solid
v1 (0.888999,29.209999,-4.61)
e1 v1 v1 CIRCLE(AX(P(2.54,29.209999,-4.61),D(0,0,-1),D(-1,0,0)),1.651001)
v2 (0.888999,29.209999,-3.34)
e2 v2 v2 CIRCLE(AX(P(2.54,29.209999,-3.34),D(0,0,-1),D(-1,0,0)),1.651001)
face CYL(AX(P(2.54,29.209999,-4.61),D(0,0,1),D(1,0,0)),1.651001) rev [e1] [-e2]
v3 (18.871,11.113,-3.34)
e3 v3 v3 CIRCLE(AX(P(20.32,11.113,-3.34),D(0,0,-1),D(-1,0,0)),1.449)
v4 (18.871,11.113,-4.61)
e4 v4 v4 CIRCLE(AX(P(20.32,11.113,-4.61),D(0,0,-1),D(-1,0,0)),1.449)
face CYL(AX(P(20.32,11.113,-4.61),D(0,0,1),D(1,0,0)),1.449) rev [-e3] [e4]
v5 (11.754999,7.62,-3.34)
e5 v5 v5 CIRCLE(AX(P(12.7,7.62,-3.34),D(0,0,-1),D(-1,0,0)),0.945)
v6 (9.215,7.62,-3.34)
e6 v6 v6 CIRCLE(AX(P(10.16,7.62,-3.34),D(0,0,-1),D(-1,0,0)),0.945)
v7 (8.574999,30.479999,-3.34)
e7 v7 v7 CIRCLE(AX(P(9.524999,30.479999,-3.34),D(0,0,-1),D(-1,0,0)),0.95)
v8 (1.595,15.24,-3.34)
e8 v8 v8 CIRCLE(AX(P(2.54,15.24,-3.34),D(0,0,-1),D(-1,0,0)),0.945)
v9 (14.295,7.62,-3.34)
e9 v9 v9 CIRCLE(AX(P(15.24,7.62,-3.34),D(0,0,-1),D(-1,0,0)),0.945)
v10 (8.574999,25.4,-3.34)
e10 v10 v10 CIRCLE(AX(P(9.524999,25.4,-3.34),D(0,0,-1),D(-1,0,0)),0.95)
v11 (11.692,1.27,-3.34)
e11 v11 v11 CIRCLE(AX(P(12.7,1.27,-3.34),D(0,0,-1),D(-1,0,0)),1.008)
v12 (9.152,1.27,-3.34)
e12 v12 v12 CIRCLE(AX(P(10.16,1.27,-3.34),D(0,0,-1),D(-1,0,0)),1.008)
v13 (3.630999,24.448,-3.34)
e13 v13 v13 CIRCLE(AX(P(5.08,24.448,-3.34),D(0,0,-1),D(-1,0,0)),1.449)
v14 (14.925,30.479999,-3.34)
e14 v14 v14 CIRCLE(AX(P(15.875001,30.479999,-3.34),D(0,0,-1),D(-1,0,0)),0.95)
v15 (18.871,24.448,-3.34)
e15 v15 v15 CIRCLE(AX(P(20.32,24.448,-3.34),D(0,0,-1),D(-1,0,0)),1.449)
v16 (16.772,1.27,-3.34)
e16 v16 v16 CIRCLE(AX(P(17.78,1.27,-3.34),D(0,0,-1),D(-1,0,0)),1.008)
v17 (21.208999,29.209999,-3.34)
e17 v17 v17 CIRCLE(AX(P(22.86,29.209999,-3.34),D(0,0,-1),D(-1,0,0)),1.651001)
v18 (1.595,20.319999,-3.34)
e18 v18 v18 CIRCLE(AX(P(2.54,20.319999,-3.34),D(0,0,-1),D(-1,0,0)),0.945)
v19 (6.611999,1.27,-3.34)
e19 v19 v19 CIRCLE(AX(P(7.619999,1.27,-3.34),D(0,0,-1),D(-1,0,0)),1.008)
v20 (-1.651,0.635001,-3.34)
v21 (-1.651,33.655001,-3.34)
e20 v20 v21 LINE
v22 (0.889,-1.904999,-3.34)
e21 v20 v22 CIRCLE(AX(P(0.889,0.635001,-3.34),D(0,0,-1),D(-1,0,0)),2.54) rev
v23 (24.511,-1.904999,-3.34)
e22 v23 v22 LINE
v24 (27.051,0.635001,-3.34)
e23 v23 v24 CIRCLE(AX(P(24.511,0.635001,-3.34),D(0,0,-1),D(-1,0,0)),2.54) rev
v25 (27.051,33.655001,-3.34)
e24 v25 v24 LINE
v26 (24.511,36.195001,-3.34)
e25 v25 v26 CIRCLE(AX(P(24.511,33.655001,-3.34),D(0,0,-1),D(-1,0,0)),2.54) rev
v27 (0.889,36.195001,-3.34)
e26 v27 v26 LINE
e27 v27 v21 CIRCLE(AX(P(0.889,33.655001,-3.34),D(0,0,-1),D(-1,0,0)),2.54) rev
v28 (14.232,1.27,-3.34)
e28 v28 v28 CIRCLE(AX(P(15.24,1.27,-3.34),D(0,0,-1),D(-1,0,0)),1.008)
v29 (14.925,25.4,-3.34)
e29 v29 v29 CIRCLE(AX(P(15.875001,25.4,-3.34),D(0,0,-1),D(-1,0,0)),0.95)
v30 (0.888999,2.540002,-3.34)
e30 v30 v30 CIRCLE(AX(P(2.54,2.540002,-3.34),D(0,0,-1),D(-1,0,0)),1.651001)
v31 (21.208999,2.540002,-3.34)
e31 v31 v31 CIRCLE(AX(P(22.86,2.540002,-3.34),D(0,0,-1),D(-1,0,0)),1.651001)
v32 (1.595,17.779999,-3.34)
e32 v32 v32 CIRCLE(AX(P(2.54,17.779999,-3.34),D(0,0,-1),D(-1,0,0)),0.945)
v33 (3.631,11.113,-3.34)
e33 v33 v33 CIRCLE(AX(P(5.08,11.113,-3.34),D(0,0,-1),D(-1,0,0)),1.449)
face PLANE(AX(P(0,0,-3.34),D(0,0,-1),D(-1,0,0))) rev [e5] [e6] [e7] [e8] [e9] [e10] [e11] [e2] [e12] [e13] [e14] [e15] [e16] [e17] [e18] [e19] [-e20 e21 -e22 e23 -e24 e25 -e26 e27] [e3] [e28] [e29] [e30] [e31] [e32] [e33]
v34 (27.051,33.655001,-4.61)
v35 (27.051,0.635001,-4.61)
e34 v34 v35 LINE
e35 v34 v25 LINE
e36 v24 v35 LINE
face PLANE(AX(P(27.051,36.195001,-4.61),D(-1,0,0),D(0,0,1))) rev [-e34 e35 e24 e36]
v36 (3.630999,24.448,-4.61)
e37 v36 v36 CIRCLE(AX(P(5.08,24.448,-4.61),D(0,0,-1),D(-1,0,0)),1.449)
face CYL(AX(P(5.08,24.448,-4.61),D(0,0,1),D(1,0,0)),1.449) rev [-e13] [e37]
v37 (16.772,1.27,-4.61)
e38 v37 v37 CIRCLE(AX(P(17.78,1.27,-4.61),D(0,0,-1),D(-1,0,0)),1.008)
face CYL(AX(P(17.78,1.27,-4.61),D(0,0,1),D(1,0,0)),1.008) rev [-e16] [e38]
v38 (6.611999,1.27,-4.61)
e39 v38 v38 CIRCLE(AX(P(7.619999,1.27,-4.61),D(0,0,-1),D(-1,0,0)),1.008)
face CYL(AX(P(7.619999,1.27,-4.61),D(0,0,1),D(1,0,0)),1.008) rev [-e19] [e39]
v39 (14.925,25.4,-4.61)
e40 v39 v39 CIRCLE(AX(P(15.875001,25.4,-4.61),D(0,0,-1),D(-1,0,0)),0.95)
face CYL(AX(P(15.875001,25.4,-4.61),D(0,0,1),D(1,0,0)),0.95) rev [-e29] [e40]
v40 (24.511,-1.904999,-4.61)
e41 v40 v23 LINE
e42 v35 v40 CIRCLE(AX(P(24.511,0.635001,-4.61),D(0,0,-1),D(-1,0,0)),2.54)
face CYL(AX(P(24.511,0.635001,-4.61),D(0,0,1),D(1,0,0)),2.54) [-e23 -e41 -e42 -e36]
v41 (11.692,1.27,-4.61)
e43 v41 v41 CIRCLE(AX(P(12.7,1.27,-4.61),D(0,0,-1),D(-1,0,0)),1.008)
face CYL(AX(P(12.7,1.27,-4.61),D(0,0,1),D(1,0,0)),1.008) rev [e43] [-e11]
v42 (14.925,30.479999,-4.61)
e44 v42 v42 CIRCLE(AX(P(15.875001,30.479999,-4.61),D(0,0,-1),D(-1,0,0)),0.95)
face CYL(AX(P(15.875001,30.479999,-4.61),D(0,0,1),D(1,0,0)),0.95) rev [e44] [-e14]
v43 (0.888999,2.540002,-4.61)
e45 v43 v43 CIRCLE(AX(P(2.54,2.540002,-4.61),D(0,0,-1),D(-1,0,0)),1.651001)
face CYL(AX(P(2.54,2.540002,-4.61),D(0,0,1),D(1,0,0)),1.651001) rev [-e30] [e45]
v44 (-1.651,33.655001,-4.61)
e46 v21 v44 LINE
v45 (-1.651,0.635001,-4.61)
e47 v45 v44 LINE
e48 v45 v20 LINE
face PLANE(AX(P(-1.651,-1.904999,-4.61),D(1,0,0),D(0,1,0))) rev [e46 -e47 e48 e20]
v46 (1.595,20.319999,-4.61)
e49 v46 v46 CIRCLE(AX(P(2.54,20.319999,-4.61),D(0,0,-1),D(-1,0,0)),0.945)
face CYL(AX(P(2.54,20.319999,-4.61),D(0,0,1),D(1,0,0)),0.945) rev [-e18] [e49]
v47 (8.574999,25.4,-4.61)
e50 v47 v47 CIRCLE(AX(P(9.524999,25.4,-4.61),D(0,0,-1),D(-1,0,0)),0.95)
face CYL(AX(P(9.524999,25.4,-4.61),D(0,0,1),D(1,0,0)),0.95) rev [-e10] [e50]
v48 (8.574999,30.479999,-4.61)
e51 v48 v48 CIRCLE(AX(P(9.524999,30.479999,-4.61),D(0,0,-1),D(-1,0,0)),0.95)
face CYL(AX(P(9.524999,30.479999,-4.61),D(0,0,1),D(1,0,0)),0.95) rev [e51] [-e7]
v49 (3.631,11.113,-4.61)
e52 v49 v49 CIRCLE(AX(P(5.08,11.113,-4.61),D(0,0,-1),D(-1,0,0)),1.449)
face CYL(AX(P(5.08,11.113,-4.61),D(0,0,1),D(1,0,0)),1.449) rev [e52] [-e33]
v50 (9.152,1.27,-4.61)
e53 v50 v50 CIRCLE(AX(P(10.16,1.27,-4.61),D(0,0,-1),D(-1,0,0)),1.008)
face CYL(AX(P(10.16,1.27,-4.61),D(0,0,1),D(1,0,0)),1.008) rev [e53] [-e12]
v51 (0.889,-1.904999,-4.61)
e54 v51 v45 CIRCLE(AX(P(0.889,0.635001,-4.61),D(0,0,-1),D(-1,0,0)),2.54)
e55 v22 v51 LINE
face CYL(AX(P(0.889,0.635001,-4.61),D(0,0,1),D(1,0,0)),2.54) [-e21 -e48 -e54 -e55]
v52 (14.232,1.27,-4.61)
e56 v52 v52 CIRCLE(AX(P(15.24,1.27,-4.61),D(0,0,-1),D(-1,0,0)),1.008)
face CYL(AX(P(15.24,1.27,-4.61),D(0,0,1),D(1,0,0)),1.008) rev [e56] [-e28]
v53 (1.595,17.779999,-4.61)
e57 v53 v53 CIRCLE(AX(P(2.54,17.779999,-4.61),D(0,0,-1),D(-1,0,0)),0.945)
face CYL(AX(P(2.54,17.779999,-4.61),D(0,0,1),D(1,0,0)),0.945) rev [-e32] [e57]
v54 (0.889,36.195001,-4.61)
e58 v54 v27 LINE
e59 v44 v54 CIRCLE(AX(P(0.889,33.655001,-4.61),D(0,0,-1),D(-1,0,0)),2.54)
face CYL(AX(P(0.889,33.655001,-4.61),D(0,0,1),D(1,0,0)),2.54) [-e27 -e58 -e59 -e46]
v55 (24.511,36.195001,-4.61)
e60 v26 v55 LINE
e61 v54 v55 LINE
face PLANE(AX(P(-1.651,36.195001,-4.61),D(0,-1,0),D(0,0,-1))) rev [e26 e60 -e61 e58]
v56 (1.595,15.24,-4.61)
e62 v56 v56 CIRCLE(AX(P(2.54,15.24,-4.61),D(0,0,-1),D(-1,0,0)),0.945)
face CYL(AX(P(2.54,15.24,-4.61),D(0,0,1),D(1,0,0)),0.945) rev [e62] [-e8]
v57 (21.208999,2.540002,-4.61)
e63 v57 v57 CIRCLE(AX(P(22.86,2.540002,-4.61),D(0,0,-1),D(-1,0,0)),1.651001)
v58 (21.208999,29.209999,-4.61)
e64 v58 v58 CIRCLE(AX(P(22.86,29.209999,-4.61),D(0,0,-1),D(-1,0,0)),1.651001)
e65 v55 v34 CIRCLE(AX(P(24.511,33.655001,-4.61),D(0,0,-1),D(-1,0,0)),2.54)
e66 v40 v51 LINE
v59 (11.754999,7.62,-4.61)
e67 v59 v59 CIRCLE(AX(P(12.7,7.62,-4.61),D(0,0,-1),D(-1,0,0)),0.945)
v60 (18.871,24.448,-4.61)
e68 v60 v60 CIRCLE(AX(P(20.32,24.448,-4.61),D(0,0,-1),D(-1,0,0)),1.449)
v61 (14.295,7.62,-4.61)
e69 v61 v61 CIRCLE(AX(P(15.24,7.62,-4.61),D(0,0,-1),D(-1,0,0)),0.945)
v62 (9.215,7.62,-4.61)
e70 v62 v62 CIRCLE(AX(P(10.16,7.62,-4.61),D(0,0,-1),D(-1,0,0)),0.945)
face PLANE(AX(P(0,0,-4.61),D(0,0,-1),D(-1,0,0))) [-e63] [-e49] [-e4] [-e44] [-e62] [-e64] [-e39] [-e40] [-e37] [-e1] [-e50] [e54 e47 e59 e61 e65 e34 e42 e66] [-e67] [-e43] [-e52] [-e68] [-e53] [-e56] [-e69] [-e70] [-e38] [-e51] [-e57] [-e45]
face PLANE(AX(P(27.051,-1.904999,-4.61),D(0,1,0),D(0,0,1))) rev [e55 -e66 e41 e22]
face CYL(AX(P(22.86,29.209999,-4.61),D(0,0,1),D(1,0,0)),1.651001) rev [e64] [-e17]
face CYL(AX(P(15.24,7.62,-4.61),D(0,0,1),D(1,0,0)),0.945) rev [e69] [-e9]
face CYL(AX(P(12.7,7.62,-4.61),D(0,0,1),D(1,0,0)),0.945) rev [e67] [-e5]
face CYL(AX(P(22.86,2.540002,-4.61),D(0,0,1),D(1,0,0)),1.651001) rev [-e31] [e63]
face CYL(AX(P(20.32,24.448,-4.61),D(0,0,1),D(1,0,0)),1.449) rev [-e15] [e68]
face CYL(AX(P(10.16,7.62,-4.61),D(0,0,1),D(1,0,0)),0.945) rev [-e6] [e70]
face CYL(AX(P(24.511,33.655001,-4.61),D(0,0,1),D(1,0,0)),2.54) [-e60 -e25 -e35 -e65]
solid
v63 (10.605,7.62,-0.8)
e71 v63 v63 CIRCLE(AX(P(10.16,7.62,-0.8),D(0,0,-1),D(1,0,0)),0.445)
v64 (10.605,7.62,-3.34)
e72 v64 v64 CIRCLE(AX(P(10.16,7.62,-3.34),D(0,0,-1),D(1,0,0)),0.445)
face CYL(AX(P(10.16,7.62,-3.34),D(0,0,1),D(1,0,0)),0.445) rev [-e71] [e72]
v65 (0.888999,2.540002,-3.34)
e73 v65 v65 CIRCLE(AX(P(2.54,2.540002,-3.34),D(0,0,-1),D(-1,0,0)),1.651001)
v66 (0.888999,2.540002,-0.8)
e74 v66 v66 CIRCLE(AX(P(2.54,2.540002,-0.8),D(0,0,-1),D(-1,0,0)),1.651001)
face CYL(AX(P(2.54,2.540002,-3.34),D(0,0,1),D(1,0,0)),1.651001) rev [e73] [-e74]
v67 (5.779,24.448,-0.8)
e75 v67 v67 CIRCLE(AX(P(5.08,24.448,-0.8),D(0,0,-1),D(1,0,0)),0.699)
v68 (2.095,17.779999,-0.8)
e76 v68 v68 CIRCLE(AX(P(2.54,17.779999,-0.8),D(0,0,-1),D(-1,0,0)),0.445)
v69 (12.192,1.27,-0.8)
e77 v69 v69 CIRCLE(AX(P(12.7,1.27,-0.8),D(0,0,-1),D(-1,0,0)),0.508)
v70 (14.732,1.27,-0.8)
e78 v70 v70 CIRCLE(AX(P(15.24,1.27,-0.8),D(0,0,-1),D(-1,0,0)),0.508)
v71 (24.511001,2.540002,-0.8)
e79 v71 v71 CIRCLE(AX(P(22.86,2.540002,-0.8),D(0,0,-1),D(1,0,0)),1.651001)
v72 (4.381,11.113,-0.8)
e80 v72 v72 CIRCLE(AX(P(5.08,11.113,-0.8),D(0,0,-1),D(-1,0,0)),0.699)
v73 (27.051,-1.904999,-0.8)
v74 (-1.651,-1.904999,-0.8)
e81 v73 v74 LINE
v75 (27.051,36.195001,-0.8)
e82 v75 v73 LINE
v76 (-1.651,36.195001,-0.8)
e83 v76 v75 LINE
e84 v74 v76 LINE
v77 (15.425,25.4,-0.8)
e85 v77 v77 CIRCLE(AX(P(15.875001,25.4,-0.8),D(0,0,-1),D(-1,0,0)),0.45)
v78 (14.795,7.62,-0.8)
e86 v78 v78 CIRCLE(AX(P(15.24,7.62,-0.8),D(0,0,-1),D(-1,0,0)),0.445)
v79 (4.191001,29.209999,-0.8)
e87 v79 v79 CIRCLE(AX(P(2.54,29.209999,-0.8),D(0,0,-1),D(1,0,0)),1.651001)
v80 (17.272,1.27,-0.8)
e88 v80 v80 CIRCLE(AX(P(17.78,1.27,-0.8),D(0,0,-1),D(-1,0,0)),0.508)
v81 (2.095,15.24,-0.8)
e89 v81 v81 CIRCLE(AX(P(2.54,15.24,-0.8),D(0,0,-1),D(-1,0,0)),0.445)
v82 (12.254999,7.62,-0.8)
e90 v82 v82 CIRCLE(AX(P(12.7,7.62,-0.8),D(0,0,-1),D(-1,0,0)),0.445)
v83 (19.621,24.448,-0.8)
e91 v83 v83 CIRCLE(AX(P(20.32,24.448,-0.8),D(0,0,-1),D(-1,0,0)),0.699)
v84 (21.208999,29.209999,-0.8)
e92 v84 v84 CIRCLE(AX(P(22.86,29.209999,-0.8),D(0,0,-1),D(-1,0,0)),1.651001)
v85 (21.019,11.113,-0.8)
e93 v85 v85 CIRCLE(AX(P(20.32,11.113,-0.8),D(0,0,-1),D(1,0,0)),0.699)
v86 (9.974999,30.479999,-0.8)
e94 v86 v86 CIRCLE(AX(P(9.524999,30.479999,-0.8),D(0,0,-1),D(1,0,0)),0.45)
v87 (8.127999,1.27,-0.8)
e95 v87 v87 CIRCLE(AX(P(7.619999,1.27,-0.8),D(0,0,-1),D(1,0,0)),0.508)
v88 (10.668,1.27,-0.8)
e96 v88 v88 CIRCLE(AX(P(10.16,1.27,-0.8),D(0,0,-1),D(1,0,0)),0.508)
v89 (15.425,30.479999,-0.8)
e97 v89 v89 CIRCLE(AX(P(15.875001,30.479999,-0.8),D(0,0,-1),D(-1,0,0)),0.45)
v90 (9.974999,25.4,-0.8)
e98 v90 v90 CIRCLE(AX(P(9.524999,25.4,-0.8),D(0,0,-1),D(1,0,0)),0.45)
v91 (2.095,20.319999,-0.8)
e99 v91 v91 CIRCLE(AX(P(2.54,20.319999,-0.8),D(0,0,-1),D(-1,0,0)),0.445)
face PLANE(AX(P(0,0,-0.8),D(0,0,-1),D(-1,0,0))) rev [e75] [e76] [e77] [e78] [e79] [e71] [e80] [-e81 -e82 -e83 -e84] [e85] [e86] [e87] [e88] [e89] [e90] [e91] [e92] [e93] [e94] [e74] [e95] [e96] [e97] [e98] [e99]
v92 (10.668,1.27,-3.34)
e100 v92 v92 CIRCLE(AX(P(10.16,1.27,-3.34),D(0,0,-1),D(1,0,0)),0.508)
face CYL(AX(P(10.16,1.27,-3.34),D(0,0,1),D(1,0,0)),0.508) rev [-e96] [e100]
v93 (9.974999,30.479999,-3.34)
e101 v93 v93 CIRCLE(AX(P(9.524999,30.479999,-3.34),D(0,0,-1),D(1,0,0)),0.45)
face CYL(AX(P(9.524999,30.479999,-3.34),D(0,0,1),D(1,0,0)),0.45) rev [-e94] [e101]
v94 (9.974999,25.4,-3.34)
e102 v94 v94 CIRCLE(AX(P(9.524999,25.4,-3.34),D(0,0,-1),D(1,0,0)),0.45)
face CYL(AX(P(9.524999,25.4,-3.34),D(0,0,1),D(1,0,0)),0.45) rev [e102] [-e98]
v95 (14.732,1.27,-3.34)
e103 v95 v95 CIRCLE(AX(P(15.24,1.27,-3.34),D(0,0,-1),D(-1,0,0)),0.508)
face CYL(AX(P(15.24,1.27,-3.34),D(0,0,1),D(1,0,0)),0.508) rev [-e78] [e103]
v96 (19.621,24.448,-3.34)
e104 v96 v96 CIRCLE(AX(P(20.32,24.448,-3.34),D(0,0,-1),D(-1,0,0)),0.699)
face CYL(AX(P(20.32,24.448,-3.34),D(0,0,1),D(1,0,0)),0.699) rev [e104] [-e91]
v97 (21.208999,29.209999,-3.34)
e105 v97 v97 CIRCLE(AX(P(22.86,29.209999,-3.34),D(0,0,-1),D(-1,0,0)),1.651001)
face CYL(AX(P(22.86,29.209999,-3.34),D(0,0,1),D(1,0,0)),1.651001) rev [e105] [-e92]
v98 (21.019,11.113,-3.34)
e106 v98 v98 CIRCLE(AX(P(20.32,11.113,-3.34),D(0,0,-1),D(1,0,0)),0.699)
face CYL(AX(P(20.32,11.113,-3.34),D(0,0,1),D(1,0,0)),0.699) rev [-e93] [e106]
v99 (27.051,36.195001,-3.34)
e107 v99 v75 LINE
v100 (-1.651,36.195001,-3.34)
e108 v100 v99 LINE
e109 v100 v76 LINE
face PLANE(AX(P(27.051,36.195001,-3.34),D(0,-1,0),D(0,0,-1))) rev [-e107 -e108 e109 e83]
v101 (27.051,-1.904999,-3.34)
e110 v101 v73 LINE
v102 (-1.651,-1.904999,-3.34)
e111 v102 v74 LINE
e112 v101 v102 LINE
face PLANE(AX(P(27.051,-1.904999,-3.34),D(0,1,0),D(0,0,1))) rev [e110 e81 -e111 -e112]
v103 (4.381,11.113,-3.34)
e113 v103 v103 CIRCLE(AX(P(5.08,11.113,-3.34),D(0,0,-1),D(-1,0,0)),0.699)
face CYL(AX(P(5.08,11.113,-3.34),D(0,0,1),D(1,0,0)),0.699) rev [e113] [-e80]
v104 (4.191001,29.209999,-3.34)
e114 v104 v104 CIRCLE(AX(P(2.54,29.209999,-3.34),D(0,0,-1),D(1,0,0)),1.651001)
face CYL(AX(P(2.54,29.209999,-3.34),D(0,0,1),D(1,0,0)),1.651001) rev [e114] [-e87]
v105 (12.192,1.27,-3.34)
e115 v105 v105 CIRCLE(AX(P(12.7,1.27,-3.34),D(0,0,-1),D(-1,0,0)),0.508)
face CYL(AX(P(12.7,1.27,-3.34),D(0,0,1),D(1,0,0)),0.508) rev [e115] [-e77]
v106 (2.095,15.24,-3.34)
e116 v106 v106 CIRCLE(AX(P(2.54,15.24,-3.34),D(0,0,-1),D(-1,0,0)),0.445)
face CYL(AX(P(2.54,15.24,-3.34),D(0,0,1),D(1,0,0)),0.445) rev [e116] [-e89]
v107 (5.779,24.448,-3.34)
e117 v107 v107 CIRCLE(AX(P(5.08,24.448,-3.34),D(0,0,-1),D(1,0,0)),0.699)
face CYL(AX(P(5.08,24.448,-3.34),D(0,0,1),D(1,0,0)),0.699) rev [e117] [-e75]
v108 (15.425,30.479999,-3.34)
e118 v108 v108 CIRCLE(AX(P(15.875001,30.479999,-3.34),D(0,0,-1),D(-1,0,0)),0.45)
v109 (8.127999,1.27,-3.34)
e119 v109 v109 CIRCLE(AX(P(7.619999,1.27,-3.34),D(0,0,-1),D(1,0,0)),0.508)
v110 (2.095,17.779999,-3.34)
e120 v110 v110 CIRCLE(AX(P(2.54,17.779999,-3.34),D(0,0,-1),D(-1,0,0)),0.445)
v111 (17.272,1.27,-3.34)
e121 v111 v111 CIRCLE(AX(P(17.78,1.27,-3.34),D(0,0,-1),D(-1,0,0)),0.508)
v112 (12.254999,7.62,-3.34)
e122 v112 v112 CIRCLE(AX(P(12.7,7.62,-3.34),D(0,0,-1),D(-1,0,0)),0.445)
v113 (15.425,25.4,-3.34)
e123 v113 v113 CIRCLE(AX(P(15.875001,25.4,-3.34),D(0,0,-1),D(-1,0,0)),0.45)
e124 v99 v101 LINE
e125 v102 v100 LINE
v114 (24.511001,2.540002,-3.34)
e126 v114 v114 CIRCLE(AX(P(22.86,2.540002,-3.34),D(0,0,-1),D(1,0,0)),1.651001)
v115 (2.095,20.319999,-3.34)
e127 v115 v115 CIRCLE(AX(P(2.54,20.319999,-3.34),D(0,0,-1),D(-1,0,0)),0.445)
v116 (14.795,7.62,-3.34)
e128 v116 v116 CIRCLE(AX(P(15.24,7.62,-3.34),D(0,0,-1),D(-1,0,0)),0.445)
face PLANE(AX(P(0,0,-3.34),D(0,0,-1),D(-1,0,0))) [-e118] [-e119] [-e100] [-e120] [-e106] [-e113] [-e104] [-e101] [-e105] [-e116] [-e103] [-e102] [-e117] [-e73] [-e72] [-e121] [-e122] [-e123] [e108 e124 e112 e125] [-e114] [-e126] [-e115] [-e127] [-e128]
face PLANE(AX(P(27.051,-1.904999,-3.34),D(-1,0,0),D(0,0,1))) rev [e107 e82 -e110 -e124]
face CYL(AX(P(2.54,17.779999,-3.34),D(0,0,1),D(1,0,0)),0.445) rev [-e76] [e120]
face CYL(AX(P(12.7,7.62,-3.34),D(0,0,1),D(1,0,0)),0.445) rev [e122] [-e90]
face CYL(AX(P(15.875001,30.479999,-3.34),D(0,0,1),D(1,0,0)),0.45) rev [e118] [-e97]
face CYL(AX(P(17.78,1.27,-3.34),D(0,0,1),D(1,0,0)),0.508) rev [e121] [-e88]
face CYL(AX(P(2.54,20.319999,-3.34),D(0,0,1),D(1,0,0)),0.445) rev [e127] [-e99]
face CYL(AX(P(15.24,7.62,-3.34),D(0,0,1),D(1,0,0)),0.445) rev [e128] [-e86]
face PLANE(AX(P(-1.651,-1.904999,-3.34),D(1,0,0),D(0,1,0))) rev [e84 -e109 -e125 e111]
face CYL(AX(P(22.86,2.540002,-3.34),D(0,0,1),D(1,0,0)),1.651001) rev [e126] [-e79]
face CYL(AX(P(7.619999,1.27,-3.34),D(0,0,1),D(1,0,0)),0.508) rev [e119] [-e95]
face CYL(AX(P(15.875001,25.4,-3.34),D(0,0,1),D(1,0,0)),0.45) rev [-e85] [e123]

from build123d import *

# Parameters (mm, degrees)
SKETCH1_W           = 28.702
SKETCH1_H           = 38.1
SKETCH1_R           = 1.651001197
SKETCH1_R_2         = 0.699000433
SKETCH1_R_3         = 0.450000167
SKETCH1_R_4         = 0.444999896
SKETCH1_R_5         = 0.698999967
SKETCH1_R_6         = 0.445000129
SKETCH1_R_7         = 0.445000362
SKETCH1_R_8         = 0.508000026
BOSS_EXTRUDE1_DEPTH = 2.54
SKETCH2_W           = 28.702
SKETCH2_H           = 38.1
SKETCH2_R           = 1.651001197
SKETCH2_R_2         = 1.449000433
SKETCH2_R_3         = 1.448999967
SKETCH2_R_4         = 0.950000167
SKETCH2_R_5         = 0.945000129
SKETCH2_R_6         = 0.945000362
SKETCH2_R_7         = 1.008000026
SKETCH2_R_8         = 0.944999896
BOSS_EXTRUDE2_DEPTH = 1.27
FILLET1_R           = 2.54


# Read off the part's stored shape, not the designer's step: Surface-Imported1
with BuildPart() as part:
    # Sketch1 → Boss-Extrude1 (new body)
    with BuildSketch(Plane(origin=(0, 0, -0.79999998), x_dir=(-1, 0, 0), z_dir=(0, 0, -1))):
        with Locations((-12.699999847, 17.145000507)):
            Rectangle(SKETCH1_W, SKETCH1_H)
        with Locations((-22.85999991, 29.209999368)):
            Circle(SKETCH1_R, mode=Mode.SUBTRACT)
        with Locations(Location((-2.539999783, 29.209999368, 0), (0, 0, 180))):
            Circle(SKETCH1_R, mode=Mode.SUBTRACT)
        with Locations((-2.539999783, 2.540001646)):
            Circle(SKETCH1_R, mode=Mode.SUBTRACT)
        with Locations(Location((-22.85999991, 2.540001646, 0), (0, 0, 180))):
            Circle(SKETCH1_R, mode=Mode.SUBTRACT)
        with Locations((-20.320000127, 24.447999895)):
            Circle(SKETCH1_R_2, mode=Mode.SUBTRACT)
        with Locations((-15.875000507, 30.479999259)):
            Circle(SKETCH1_R_3, mode=Mode.SUBTRACT)
        with Locations((-15.875000507, 25.399999693)):
            Circle(SKETCH1_R_3, mode=Mode.SUBTRACT)
        with Locations(Location((-9.524999186, 30.479999259, 0), (0, 0, 180))):
            Circle(SKETCH1_R_3, mode=Mode.SUBTRACT)
        with Locations(Location((-9.524999186, 25.399999693, 0), (0, 0, 180))):
            Circle(SKETCH1_R_3, mode=Mode.SUBTRACT)
        with Locations(Location((-5.079999566, 24.447999895, 0), (0, 0, 180))):
            Circle(SKETCH1_R_2, mode=Mode.SUBTRACT)
        with Locations((-2.540000016, 20.319999196)):
            Circle(SKETCH1_R_4, mode=Mode.SUBTRACT)
        with Locations((-2.540000016, 17.779999413)):
            Circle(SKETCH1_R_4, mode=Mode.SUBTRACT)
        with Locations((-2.540000016, 15.23999963)):
            Circle(SKETCH1_R_4, mode=Mode.SUBTRACT)
        with Locations((-5.080000032, 11.112999637)):
            Circle(SKETCH1_R_5, mode=Mode.SUBTRACT)
        with Locations(Location((-20.319999661, 11.112999637, 0), (0, 0, 180))):
            Circle(SKETCH1_R_5, mode=Mode.SUBTRACT)
        with Locations((-15.23999963, 7.620000048)):
            Circle(SKETCH1_R_6, mode=Mode.SUBTRACT)
        with Locations(Location((-10.160000063, 7.620000048, 0), (0, 0, 180))):
            Circle(SKETCH1_R_6, mode=Mode.SUBTRACT)
        with Locations((-12.699999847, 7.619999815)):
            Circle(SKETCH1_R_7, mode=Mode.SUBTRACT)
        with Locations((-17.780000344, 1.270000008)):
            Circle(SKETCH1_R_8, mode=Mode.SUBTRACT)
        with Locations((-15.23999963, 1.270000008)):
            Circle(SKETCH1_R_8, mode=Mode.SUBTRACT)
        with Locations((-12.699999847, 1.270000008)):
            Circle(SKETCH1_R_8, mode=Mode.SUBTRACT)
        with Locations(Location((-7.619999349, 1.270000008, 0), (0, 0, 180))):
            Circle(SKETCH1_R_8, mode=Mode.SUBTRACT)
        with Locations(Location((-10.160000063, 1.270000008, 0), (0, 0, 180))):
            Circle(SKETCH1_R_8, mode=Mode.SUBTRACT)
    extrude(amount=BOSS_EXTRUDE1_DEPTH)


with BuildPart() as body_2:
    # Sketch2 → Boss-Extrude2 (new body)
    with BuildSketch(Plane(origin=(0, 0, -3.33999998), x_dir=(-1, 0, 0), z_dir=(0, 0, -1))):
        with Locations((-12.699999847, 17.145000507)):
            Rectangle(SKETCH2_W, SKETCH2_H)
        with Locations((-2.539999783, 2.540001646)):
            Circle(SKETCH2_R, mode=Mode.SUBTRACT)
        with Locations((-22.85999991, 2.540001646)):
            Circle(SKETCH2_R, mode=Mode.SUBTRACT)
        with Locations((-2.539999783, 29.209999368)):
            Circle(SKETCH2_R, mode=Mode.SUBTRACT)
        with Locations((-22.85999991, 29.209999368)):
            Circle(SKETCH2_R, mode=Mode.SUBTRACT)
        with Locations((-20.320000127, 24.447999895)):
            Circle(SKETCH2_R_2, mode=Mode.SUBTRACT)
        with Locations((-5.079999566, 24.447999895)):
            Circle(SKETCH2_R_2, mode=Mode.SUBTRACT)
        with Locations((-5.080000032, 11.112999637)):
            Circle(SKETCH2_R_3, mode=Mode.SUBTRACT)
        with Locations((-20.319999661, 11.112999637)):
            Circle(SKETCH2_R_3, mode=Mode.SUBTRACT)
        with Locations((-15.875000507, 30.479999259)):
            Circle(SKETCH2_R_4, mode=Mode.SUBTRACT)
        with Locations((-9.524999186, 30.479999259)):
            Circle(SKETCH2_R_4, mode=Mode.SUBTRACT)
        with Locations((-15.875000507, 25.399999693)):
            Circle(SKETCH2_R_4, mode=Mode.SUBTRACT)
        with Locations((-9.524999186, 25.399999693)):
            Circle(SKETCH2_R_4, mode=Mode.SUBTRACT)
        with Locations((-15.23999963, 7.620000048)):
            Circle(SKETCH2_R_5, mode=Mode.SUBTRACT)
        with Locations((-12.699999847, 7.619999815)):
            Circle(SKETCH2_R_6, mode=Mode.SUBTRACT)
        with Locations((-10.160000063, 7.620000048)):
            Circle(SKETCH2_R_5, mode=Mode.SUBTRACT)
        with Locations((-17.780000344, 1.270000008)):
            Circle(SKETCH2_R_7, mode=Mode.SUBTRACT)
        with Locations((-15.23999963, 1.270000008)):
            Circle(SKETCH2_R_7, mode=Mode.SUBTRACT)
        with Locations((-12.699999847, 1.270000008)):
            Circle(SKETCH2_R_7, mode=Mode.SUBTRACT)
        with Locations((-10.160000063, 1.270000008)):
            Circle(SKETCH2_R_7, mode=Mode.SUBTRACT)
        with Locations((-7.619999349, 1.270000008)):
            Circle(SKETCH2_R_7, mode=Mode.SUBTRACT)
        with Locations((-2.540000016, 15.23999963)):
            Circle(SKETCH2_R_8, mode=Mode.SUBTRACT)
        with Locations((-2.540000016, 17.779999413)):
            Circle(SKETCH2_R_8, mode=Mode.SUBTRACT)
        with Locations((-2.540000016, 20.319999196)):
            Circle(SKETCH2_R_8, mode=Mode.SUBTRACT)
    extrude(amount=BOSS_EXTRUDE2_DEPTH)

    # Fillet1
    fillet1_edges = [body_2.edges().sort_by_distance(p)[0] for p in [
        (27.050999847, -1.904999493, -3.97499998),
        (27.050999847, 36.195000507, -3.97499998),
        (-1.651000153, 36.195000507, -3.97499998),
        (-1.651000153, -1.904999493, -3.97499998),
    ]]
    fillet(fillet1_edges, radius=FILLET1_R)


solid = Compound([part.part, body_2.part])
